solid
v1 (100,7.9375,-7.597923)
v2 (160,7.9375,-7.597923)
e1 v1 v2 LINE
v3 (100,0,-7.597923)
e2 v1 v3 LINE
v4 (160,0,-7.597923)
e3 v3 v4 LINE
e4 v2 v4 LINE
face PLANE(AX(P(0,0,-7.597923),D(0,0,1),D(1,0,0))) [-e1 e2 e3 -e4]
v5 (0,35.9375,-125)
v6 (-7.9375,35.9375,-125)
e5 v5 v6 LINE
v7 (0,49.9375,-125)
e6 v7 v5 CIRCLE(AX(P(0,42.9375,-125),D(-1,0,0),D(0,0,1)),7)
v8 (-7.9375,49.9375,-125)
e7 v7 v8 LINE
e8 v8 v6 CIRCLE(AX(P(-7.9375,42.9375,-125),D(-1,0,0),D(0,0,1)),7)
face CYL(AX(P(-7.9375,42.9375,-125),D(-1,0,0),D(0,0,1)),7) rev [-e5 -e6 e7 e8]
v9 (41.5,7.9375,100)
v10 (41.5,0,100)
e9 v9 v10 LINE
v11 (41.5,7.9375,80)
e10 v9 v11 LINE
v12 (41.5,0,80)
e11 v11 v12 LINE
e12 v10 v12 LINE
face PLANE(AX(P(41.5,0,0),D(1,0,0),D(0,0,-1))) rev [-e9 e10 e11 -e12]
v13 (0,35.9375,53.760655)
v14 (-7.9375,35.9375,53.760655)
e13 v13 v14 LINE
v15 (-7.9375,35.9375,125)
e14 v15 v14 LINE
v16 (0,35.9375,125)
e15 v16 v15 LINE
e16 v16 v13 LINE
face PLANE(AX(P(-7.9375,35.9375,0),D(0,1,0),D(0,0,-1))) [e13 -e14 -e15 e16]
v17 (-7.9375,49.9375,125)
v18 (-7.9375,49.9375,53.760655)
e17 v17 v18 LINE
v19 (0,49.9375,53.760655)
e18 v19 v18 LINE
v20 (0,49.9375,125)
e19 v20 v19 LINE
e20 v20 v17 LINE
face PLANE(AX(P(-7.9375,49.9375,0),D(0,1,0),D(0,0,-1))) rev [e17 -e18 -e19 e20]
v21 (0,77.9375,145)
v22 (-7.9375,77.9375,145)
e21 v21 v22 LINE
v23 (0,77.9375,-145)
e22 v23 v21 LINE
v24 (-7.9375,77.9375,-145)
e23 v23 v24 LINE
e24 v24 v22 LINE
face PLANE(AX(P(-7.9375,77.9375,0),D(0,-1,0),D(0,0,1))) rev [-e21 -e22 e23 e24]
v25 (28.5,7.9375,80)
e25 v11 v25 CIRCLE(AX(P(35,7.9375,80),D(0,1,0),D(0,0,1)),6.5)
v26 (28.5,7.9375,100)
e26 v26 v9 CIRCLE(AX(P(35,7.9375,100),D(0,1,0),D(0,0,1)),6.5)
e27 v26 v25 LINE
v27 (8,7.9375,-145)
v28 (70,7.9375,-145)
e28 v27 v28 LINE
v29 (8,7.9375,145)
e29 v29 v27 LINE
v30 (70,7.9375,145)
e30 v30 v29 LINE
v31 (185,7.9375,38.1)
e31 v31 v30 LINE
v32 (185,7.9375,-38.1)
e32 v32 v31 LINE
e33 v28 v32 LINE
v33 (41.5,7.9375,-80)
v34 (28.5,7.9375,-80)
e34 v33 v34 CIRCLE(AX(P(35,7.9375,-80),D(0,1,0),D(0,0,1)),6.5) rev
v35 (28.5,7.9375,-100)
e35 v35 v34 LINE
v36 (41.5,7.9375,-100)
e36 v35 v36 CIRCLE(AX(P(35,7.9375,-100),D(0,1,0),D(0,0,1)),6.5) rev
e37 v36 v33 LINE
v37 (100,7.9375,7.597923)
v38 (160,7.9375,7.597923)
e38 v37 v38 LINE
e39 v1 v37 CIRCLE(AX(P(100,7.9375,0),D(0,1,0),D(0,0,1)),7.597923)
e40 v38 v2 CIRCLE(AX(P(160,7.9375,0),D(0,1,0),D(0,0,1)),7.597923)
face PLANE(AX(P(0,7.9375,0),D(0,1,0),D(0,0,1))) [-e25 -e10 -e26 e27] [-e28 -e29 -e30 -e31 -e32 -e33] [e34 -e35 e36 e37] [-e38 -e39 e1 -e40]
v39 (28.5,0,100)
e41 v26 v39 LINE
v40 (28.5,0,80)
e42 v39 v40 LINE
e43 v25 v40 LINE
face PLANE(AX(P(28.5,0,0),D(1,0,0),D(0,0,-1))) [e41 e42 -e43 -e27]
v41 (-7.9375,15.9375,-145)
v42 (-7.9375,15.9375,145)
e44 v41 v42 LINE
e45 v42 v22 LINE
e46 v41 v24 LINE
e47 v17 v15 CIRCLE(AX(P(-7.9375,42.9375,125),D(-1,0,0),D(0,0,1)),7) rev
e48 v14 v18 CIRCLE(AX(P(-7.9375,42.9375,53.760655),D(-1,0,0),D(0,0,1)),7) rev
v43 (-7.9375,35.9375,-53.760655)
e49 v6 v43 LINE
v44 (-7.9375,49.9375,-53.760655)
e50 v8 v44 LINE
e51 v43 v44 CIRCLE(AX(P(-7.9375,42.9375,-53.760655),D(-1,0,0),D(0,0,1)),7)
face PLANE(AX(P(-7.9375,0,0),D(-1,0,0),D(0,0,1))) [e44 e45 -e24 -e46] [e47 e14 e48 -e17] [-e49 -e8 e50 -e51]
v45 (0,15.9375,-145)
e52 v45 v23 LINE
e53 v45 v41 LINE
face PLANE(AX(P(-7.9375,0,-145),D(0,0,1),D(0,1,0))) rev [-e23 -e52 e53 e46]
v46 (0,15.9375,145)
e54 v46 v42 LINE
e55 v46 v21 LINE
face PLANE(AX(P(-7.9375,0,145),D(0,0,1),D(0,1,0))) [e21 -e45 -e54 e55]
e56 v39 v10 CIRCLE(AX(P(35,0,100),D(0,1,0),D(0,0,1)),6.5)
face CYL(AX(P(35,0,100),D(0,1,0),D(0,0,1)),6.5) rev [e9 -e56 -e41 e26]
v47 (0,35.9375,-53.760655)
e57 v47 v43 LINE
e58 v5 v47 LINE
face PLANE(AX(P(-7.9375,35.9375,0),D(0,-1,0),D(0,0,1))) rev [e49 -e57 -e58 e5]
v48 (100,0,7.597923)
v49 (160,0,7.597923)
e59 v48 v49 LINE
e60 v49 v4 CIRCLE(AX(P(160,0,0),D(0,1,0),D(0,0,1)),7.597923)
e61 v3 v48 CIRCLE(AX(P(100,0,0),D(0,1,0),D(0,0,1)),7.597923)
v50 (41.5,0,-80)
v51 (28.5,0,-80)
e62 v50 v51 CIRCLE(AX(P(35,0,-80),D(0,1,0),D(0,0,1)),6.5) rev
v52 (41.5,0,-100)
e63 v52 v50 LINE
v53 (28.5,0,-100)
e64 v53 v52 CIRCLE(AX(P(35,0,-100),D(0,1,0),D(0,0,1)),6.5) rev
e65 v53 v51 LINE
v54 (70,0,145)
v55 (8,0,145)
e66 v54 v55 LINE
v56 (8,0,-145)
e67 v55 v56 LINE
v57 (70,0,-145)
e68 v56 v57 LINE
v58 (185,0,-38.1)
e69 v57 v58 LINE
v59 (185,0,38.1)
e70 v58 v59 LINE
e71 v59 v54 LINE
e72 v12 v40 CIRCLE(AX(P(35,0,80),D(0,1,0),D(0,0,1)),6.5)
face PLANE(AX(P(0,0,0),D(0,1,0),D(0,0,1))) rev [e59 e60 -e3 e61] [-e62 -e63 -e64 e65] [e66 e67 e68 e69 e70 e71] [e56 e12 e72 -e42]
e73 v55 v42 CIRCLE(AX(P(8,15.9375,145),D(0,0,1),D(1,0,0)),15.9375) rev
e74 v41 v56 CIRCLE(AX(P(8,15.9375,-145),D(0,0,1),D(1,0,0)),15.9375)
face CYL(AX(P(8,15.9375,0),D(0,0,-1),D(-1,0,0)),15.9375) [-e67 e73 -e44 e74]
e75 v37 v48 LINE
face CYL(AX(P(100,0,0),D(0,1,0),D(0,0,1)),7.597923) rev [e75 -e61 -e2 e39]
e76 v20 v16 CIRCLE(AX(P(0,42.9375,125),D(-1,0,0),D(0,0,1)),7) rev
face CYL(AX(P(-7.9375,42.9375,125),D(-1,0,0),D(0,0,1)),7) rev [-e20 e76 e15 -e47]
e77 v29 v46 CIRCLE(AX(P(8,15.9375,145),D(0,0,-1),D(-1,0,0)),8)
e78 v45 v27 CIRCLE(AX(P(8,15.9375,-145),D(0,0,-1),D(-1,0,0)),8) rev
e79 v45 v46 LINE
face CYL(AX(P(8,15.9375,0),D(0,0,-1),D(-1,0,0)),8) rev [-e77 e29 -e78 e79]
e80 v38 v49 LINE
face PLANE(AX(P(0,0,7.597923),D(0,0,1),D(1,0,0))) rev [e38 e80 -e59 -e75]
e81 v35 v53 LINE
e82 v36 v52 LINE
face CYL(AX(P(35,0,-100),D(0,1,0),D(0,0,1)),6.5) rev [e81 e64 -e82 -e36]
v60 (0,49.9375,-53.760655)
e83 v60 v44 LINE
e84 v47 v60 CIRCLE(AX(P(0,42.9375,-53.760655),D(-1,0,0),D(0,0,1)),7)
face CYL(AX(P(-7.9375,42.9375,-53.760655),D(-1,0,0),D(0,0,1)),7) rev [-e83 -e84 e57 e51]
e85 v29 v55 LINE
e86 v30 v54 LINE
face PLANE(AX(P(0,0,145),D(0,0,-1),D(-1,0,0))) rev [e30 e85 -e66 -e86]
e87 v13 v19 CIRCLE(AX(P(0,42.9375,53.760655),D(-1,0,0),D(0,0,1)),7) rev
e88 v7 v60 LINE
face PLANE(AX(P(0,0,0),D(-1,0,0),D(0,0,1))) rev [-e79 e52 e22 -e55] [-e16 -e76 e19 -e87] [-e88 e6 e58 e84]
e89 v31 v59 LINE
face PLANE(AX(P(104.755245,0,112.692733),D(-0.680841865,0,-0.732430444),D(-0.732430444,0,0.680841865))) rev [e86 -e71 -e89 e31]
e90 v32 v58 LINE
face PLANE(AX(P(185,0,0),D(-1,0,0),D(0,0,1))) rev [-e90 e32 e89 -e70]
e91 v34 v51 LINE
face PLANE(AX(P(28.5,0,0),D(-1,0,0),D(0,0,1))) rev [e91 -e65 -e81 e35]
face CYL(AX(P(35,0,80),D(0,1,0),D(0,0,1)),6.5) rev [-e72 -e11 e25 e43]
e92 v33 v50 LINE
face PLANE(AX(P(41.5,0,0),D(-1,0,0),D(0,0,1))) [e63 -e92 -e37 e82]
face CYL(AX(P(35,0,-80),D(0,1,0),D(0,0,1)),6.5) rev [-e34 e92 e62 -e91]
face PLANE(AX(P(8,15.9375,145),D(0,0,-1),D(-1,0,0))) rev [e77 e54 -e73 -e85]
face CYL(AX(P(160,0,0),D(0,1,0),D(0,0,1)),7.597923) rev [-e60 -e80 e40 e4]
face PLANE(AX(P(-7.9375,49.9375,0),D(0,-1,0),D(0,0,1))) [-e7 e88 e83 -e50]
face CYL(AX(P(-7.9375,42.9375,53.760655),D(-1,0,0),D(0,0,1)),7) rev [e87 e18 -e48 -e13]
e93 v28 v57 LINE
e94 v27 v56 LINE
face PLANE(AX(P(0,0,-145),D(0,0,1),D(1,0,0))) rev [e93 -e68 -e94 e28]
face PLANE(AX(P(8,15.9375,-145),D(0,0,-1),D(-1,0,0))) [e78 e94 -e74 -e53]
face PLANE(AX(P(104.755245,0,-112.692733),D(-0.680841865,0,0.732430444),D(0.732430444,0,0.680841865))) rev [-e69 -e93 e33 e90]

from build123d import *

# Parameters (mm, degrees)
SALIENTE_EXTRUIR1_DEPTH   = 7.9375
CROQUIS2_W                = 290
CROQUIS2_H                = 77.9375
SALIENTE_EXTRUIR2_DEPTH   = 7.9375
CONVERTIR_S_LIDO1_START   = -145
CONVERTIR_S_LIDO1_DEPTH   = 290
CONVERTIR_S_LIDO1_2_DEPTH = 290


# Read off the part's stored shape, not the designer's step: Convertir-Sólido1
with BuildPart() as part:
    # Croquis1 → Saliente-Extruir1 (new body)
    with BuildSketch(Plane(origin=(0, 0, 0), x_dir=(1, 0, 0), z_dir=(0, 1, 0))):
        Polygon((70, -145), (0, -145), (0, 145), (70, 145), (185, 38.1), (185, -38.1), align=None)
        with BuildLine():
            ThreePointArc((41.5, -80), (35, -73.5), (28.5, -80))
            Line((28.5, -80), (28.5, -100))
            ThreePointArc((28.5, -100), (35, -106.5), (41.5, -100))
            Line((41.5, -100), (41.5, -80))
        make_face(mode=Mode.SUBTRACT)
        with BuildLine():
            ThreePointArc((160, -7.597922996), (167.597922996, 0), (160, 7.597922996))
            Line((160, 7.597922996), (100, 7.597922996))
            ThreePointArc((100, 7.597922996), (92.402077004, 0), (100, -7.597922996))
            Line((100, -7.597922996), (160, -7.597922996))
        make_face(mode=Mode.SUBTRACT)
        with BuildLine():
            Line((41.5, 100), (41.5, 80))
            ThreePointArc((41.5, 80), (35, 73.5), (28.5, 80))
            Line((28.5, 80), (28.5, 100))
            ThreePointArc((28.5, 100), (35, 106.5), (41.5, 100))
        make_face(mode=Mode.SUBTRACT)
    extrude(amount=SALIENTE_EXTRUIR1_DEPTH)

    # Croquis2 → Saliente-Extruir2 (add)
    with BuildSketch(Plane.ZY):
        with Locations((0, 38.96875)):
            Rectangle(CROQUIS2_W, CROQUIS2_H)
        with BuildLine():
            ThreePointArc((-125, 35.9375), (-132, 42.9375), (-125, 49.9375))
            Line((-125, 49.9375), (-53.76065494, 49.9375))
            ThreePointArc((-53.76065494, 49.9375), (-46.76065494, 42.9375), (-53.76065494, 35.9375))
            Line((-53.76065494, 35.9375), (-125, 35.9375))
        make_face(mode=Mode.SUBTRACT)
        with BuildLine():
            Line((53.76065494, 49.9375), (125, 49.9375))
            ThreePointArc((125, 49.9375), (132, 42.9375), (125, 35.9375))
            Line((125, 35.9375), (53.76065494, 35.9375))
            ThreePointArc((53.76065494, 35.9375), (46.76065494, 42.9375), (53.76065494, 49.9375))
        make_face(mode=Mode.SUBTRACT)
    extrude(amount=SALIENTE_EXTRUIR2_DEPTH)

    # Convertir-Sólido1 outline → Convertir-Sólido1 (cut)
    with BuildSketch(Plane.XY.offset(CONVERTIR_S_LIDO1_START)):
        with BuildLine():
            Line((-7.9375, 0), (8, 0))
            ThreePointArc((8, 0), (-3.269514325, 4.667985675), (-7.9375, 15.9375))
            Line((-7.9375, 15.9375), (-7.9375, 0))
        make_face()
    extrude(amount=CONVERTIR_S_LIDO1_DEPTH, mode=Mode.SUBTRACT)

    # Convertir-S_lido1 2 outline → Convertir-S_lido1 2 (add)
    with BuildSketch(Plane.XY.offset(CONVERTIR_S_LIDO1_START)):
        with BuildLine():
            Line((0, 7.9375), (8, 7.9375))
            ThreePointArc((8, 7.9375), (2.343145751, 10.280645751), (0, 15.9375))
            Line((0, 15.9375), (0, 7.9375))
        make_face()
    extrude(amount=CONVERTIR_S_LIDO1_2_DEPTH)


solid = part.part
